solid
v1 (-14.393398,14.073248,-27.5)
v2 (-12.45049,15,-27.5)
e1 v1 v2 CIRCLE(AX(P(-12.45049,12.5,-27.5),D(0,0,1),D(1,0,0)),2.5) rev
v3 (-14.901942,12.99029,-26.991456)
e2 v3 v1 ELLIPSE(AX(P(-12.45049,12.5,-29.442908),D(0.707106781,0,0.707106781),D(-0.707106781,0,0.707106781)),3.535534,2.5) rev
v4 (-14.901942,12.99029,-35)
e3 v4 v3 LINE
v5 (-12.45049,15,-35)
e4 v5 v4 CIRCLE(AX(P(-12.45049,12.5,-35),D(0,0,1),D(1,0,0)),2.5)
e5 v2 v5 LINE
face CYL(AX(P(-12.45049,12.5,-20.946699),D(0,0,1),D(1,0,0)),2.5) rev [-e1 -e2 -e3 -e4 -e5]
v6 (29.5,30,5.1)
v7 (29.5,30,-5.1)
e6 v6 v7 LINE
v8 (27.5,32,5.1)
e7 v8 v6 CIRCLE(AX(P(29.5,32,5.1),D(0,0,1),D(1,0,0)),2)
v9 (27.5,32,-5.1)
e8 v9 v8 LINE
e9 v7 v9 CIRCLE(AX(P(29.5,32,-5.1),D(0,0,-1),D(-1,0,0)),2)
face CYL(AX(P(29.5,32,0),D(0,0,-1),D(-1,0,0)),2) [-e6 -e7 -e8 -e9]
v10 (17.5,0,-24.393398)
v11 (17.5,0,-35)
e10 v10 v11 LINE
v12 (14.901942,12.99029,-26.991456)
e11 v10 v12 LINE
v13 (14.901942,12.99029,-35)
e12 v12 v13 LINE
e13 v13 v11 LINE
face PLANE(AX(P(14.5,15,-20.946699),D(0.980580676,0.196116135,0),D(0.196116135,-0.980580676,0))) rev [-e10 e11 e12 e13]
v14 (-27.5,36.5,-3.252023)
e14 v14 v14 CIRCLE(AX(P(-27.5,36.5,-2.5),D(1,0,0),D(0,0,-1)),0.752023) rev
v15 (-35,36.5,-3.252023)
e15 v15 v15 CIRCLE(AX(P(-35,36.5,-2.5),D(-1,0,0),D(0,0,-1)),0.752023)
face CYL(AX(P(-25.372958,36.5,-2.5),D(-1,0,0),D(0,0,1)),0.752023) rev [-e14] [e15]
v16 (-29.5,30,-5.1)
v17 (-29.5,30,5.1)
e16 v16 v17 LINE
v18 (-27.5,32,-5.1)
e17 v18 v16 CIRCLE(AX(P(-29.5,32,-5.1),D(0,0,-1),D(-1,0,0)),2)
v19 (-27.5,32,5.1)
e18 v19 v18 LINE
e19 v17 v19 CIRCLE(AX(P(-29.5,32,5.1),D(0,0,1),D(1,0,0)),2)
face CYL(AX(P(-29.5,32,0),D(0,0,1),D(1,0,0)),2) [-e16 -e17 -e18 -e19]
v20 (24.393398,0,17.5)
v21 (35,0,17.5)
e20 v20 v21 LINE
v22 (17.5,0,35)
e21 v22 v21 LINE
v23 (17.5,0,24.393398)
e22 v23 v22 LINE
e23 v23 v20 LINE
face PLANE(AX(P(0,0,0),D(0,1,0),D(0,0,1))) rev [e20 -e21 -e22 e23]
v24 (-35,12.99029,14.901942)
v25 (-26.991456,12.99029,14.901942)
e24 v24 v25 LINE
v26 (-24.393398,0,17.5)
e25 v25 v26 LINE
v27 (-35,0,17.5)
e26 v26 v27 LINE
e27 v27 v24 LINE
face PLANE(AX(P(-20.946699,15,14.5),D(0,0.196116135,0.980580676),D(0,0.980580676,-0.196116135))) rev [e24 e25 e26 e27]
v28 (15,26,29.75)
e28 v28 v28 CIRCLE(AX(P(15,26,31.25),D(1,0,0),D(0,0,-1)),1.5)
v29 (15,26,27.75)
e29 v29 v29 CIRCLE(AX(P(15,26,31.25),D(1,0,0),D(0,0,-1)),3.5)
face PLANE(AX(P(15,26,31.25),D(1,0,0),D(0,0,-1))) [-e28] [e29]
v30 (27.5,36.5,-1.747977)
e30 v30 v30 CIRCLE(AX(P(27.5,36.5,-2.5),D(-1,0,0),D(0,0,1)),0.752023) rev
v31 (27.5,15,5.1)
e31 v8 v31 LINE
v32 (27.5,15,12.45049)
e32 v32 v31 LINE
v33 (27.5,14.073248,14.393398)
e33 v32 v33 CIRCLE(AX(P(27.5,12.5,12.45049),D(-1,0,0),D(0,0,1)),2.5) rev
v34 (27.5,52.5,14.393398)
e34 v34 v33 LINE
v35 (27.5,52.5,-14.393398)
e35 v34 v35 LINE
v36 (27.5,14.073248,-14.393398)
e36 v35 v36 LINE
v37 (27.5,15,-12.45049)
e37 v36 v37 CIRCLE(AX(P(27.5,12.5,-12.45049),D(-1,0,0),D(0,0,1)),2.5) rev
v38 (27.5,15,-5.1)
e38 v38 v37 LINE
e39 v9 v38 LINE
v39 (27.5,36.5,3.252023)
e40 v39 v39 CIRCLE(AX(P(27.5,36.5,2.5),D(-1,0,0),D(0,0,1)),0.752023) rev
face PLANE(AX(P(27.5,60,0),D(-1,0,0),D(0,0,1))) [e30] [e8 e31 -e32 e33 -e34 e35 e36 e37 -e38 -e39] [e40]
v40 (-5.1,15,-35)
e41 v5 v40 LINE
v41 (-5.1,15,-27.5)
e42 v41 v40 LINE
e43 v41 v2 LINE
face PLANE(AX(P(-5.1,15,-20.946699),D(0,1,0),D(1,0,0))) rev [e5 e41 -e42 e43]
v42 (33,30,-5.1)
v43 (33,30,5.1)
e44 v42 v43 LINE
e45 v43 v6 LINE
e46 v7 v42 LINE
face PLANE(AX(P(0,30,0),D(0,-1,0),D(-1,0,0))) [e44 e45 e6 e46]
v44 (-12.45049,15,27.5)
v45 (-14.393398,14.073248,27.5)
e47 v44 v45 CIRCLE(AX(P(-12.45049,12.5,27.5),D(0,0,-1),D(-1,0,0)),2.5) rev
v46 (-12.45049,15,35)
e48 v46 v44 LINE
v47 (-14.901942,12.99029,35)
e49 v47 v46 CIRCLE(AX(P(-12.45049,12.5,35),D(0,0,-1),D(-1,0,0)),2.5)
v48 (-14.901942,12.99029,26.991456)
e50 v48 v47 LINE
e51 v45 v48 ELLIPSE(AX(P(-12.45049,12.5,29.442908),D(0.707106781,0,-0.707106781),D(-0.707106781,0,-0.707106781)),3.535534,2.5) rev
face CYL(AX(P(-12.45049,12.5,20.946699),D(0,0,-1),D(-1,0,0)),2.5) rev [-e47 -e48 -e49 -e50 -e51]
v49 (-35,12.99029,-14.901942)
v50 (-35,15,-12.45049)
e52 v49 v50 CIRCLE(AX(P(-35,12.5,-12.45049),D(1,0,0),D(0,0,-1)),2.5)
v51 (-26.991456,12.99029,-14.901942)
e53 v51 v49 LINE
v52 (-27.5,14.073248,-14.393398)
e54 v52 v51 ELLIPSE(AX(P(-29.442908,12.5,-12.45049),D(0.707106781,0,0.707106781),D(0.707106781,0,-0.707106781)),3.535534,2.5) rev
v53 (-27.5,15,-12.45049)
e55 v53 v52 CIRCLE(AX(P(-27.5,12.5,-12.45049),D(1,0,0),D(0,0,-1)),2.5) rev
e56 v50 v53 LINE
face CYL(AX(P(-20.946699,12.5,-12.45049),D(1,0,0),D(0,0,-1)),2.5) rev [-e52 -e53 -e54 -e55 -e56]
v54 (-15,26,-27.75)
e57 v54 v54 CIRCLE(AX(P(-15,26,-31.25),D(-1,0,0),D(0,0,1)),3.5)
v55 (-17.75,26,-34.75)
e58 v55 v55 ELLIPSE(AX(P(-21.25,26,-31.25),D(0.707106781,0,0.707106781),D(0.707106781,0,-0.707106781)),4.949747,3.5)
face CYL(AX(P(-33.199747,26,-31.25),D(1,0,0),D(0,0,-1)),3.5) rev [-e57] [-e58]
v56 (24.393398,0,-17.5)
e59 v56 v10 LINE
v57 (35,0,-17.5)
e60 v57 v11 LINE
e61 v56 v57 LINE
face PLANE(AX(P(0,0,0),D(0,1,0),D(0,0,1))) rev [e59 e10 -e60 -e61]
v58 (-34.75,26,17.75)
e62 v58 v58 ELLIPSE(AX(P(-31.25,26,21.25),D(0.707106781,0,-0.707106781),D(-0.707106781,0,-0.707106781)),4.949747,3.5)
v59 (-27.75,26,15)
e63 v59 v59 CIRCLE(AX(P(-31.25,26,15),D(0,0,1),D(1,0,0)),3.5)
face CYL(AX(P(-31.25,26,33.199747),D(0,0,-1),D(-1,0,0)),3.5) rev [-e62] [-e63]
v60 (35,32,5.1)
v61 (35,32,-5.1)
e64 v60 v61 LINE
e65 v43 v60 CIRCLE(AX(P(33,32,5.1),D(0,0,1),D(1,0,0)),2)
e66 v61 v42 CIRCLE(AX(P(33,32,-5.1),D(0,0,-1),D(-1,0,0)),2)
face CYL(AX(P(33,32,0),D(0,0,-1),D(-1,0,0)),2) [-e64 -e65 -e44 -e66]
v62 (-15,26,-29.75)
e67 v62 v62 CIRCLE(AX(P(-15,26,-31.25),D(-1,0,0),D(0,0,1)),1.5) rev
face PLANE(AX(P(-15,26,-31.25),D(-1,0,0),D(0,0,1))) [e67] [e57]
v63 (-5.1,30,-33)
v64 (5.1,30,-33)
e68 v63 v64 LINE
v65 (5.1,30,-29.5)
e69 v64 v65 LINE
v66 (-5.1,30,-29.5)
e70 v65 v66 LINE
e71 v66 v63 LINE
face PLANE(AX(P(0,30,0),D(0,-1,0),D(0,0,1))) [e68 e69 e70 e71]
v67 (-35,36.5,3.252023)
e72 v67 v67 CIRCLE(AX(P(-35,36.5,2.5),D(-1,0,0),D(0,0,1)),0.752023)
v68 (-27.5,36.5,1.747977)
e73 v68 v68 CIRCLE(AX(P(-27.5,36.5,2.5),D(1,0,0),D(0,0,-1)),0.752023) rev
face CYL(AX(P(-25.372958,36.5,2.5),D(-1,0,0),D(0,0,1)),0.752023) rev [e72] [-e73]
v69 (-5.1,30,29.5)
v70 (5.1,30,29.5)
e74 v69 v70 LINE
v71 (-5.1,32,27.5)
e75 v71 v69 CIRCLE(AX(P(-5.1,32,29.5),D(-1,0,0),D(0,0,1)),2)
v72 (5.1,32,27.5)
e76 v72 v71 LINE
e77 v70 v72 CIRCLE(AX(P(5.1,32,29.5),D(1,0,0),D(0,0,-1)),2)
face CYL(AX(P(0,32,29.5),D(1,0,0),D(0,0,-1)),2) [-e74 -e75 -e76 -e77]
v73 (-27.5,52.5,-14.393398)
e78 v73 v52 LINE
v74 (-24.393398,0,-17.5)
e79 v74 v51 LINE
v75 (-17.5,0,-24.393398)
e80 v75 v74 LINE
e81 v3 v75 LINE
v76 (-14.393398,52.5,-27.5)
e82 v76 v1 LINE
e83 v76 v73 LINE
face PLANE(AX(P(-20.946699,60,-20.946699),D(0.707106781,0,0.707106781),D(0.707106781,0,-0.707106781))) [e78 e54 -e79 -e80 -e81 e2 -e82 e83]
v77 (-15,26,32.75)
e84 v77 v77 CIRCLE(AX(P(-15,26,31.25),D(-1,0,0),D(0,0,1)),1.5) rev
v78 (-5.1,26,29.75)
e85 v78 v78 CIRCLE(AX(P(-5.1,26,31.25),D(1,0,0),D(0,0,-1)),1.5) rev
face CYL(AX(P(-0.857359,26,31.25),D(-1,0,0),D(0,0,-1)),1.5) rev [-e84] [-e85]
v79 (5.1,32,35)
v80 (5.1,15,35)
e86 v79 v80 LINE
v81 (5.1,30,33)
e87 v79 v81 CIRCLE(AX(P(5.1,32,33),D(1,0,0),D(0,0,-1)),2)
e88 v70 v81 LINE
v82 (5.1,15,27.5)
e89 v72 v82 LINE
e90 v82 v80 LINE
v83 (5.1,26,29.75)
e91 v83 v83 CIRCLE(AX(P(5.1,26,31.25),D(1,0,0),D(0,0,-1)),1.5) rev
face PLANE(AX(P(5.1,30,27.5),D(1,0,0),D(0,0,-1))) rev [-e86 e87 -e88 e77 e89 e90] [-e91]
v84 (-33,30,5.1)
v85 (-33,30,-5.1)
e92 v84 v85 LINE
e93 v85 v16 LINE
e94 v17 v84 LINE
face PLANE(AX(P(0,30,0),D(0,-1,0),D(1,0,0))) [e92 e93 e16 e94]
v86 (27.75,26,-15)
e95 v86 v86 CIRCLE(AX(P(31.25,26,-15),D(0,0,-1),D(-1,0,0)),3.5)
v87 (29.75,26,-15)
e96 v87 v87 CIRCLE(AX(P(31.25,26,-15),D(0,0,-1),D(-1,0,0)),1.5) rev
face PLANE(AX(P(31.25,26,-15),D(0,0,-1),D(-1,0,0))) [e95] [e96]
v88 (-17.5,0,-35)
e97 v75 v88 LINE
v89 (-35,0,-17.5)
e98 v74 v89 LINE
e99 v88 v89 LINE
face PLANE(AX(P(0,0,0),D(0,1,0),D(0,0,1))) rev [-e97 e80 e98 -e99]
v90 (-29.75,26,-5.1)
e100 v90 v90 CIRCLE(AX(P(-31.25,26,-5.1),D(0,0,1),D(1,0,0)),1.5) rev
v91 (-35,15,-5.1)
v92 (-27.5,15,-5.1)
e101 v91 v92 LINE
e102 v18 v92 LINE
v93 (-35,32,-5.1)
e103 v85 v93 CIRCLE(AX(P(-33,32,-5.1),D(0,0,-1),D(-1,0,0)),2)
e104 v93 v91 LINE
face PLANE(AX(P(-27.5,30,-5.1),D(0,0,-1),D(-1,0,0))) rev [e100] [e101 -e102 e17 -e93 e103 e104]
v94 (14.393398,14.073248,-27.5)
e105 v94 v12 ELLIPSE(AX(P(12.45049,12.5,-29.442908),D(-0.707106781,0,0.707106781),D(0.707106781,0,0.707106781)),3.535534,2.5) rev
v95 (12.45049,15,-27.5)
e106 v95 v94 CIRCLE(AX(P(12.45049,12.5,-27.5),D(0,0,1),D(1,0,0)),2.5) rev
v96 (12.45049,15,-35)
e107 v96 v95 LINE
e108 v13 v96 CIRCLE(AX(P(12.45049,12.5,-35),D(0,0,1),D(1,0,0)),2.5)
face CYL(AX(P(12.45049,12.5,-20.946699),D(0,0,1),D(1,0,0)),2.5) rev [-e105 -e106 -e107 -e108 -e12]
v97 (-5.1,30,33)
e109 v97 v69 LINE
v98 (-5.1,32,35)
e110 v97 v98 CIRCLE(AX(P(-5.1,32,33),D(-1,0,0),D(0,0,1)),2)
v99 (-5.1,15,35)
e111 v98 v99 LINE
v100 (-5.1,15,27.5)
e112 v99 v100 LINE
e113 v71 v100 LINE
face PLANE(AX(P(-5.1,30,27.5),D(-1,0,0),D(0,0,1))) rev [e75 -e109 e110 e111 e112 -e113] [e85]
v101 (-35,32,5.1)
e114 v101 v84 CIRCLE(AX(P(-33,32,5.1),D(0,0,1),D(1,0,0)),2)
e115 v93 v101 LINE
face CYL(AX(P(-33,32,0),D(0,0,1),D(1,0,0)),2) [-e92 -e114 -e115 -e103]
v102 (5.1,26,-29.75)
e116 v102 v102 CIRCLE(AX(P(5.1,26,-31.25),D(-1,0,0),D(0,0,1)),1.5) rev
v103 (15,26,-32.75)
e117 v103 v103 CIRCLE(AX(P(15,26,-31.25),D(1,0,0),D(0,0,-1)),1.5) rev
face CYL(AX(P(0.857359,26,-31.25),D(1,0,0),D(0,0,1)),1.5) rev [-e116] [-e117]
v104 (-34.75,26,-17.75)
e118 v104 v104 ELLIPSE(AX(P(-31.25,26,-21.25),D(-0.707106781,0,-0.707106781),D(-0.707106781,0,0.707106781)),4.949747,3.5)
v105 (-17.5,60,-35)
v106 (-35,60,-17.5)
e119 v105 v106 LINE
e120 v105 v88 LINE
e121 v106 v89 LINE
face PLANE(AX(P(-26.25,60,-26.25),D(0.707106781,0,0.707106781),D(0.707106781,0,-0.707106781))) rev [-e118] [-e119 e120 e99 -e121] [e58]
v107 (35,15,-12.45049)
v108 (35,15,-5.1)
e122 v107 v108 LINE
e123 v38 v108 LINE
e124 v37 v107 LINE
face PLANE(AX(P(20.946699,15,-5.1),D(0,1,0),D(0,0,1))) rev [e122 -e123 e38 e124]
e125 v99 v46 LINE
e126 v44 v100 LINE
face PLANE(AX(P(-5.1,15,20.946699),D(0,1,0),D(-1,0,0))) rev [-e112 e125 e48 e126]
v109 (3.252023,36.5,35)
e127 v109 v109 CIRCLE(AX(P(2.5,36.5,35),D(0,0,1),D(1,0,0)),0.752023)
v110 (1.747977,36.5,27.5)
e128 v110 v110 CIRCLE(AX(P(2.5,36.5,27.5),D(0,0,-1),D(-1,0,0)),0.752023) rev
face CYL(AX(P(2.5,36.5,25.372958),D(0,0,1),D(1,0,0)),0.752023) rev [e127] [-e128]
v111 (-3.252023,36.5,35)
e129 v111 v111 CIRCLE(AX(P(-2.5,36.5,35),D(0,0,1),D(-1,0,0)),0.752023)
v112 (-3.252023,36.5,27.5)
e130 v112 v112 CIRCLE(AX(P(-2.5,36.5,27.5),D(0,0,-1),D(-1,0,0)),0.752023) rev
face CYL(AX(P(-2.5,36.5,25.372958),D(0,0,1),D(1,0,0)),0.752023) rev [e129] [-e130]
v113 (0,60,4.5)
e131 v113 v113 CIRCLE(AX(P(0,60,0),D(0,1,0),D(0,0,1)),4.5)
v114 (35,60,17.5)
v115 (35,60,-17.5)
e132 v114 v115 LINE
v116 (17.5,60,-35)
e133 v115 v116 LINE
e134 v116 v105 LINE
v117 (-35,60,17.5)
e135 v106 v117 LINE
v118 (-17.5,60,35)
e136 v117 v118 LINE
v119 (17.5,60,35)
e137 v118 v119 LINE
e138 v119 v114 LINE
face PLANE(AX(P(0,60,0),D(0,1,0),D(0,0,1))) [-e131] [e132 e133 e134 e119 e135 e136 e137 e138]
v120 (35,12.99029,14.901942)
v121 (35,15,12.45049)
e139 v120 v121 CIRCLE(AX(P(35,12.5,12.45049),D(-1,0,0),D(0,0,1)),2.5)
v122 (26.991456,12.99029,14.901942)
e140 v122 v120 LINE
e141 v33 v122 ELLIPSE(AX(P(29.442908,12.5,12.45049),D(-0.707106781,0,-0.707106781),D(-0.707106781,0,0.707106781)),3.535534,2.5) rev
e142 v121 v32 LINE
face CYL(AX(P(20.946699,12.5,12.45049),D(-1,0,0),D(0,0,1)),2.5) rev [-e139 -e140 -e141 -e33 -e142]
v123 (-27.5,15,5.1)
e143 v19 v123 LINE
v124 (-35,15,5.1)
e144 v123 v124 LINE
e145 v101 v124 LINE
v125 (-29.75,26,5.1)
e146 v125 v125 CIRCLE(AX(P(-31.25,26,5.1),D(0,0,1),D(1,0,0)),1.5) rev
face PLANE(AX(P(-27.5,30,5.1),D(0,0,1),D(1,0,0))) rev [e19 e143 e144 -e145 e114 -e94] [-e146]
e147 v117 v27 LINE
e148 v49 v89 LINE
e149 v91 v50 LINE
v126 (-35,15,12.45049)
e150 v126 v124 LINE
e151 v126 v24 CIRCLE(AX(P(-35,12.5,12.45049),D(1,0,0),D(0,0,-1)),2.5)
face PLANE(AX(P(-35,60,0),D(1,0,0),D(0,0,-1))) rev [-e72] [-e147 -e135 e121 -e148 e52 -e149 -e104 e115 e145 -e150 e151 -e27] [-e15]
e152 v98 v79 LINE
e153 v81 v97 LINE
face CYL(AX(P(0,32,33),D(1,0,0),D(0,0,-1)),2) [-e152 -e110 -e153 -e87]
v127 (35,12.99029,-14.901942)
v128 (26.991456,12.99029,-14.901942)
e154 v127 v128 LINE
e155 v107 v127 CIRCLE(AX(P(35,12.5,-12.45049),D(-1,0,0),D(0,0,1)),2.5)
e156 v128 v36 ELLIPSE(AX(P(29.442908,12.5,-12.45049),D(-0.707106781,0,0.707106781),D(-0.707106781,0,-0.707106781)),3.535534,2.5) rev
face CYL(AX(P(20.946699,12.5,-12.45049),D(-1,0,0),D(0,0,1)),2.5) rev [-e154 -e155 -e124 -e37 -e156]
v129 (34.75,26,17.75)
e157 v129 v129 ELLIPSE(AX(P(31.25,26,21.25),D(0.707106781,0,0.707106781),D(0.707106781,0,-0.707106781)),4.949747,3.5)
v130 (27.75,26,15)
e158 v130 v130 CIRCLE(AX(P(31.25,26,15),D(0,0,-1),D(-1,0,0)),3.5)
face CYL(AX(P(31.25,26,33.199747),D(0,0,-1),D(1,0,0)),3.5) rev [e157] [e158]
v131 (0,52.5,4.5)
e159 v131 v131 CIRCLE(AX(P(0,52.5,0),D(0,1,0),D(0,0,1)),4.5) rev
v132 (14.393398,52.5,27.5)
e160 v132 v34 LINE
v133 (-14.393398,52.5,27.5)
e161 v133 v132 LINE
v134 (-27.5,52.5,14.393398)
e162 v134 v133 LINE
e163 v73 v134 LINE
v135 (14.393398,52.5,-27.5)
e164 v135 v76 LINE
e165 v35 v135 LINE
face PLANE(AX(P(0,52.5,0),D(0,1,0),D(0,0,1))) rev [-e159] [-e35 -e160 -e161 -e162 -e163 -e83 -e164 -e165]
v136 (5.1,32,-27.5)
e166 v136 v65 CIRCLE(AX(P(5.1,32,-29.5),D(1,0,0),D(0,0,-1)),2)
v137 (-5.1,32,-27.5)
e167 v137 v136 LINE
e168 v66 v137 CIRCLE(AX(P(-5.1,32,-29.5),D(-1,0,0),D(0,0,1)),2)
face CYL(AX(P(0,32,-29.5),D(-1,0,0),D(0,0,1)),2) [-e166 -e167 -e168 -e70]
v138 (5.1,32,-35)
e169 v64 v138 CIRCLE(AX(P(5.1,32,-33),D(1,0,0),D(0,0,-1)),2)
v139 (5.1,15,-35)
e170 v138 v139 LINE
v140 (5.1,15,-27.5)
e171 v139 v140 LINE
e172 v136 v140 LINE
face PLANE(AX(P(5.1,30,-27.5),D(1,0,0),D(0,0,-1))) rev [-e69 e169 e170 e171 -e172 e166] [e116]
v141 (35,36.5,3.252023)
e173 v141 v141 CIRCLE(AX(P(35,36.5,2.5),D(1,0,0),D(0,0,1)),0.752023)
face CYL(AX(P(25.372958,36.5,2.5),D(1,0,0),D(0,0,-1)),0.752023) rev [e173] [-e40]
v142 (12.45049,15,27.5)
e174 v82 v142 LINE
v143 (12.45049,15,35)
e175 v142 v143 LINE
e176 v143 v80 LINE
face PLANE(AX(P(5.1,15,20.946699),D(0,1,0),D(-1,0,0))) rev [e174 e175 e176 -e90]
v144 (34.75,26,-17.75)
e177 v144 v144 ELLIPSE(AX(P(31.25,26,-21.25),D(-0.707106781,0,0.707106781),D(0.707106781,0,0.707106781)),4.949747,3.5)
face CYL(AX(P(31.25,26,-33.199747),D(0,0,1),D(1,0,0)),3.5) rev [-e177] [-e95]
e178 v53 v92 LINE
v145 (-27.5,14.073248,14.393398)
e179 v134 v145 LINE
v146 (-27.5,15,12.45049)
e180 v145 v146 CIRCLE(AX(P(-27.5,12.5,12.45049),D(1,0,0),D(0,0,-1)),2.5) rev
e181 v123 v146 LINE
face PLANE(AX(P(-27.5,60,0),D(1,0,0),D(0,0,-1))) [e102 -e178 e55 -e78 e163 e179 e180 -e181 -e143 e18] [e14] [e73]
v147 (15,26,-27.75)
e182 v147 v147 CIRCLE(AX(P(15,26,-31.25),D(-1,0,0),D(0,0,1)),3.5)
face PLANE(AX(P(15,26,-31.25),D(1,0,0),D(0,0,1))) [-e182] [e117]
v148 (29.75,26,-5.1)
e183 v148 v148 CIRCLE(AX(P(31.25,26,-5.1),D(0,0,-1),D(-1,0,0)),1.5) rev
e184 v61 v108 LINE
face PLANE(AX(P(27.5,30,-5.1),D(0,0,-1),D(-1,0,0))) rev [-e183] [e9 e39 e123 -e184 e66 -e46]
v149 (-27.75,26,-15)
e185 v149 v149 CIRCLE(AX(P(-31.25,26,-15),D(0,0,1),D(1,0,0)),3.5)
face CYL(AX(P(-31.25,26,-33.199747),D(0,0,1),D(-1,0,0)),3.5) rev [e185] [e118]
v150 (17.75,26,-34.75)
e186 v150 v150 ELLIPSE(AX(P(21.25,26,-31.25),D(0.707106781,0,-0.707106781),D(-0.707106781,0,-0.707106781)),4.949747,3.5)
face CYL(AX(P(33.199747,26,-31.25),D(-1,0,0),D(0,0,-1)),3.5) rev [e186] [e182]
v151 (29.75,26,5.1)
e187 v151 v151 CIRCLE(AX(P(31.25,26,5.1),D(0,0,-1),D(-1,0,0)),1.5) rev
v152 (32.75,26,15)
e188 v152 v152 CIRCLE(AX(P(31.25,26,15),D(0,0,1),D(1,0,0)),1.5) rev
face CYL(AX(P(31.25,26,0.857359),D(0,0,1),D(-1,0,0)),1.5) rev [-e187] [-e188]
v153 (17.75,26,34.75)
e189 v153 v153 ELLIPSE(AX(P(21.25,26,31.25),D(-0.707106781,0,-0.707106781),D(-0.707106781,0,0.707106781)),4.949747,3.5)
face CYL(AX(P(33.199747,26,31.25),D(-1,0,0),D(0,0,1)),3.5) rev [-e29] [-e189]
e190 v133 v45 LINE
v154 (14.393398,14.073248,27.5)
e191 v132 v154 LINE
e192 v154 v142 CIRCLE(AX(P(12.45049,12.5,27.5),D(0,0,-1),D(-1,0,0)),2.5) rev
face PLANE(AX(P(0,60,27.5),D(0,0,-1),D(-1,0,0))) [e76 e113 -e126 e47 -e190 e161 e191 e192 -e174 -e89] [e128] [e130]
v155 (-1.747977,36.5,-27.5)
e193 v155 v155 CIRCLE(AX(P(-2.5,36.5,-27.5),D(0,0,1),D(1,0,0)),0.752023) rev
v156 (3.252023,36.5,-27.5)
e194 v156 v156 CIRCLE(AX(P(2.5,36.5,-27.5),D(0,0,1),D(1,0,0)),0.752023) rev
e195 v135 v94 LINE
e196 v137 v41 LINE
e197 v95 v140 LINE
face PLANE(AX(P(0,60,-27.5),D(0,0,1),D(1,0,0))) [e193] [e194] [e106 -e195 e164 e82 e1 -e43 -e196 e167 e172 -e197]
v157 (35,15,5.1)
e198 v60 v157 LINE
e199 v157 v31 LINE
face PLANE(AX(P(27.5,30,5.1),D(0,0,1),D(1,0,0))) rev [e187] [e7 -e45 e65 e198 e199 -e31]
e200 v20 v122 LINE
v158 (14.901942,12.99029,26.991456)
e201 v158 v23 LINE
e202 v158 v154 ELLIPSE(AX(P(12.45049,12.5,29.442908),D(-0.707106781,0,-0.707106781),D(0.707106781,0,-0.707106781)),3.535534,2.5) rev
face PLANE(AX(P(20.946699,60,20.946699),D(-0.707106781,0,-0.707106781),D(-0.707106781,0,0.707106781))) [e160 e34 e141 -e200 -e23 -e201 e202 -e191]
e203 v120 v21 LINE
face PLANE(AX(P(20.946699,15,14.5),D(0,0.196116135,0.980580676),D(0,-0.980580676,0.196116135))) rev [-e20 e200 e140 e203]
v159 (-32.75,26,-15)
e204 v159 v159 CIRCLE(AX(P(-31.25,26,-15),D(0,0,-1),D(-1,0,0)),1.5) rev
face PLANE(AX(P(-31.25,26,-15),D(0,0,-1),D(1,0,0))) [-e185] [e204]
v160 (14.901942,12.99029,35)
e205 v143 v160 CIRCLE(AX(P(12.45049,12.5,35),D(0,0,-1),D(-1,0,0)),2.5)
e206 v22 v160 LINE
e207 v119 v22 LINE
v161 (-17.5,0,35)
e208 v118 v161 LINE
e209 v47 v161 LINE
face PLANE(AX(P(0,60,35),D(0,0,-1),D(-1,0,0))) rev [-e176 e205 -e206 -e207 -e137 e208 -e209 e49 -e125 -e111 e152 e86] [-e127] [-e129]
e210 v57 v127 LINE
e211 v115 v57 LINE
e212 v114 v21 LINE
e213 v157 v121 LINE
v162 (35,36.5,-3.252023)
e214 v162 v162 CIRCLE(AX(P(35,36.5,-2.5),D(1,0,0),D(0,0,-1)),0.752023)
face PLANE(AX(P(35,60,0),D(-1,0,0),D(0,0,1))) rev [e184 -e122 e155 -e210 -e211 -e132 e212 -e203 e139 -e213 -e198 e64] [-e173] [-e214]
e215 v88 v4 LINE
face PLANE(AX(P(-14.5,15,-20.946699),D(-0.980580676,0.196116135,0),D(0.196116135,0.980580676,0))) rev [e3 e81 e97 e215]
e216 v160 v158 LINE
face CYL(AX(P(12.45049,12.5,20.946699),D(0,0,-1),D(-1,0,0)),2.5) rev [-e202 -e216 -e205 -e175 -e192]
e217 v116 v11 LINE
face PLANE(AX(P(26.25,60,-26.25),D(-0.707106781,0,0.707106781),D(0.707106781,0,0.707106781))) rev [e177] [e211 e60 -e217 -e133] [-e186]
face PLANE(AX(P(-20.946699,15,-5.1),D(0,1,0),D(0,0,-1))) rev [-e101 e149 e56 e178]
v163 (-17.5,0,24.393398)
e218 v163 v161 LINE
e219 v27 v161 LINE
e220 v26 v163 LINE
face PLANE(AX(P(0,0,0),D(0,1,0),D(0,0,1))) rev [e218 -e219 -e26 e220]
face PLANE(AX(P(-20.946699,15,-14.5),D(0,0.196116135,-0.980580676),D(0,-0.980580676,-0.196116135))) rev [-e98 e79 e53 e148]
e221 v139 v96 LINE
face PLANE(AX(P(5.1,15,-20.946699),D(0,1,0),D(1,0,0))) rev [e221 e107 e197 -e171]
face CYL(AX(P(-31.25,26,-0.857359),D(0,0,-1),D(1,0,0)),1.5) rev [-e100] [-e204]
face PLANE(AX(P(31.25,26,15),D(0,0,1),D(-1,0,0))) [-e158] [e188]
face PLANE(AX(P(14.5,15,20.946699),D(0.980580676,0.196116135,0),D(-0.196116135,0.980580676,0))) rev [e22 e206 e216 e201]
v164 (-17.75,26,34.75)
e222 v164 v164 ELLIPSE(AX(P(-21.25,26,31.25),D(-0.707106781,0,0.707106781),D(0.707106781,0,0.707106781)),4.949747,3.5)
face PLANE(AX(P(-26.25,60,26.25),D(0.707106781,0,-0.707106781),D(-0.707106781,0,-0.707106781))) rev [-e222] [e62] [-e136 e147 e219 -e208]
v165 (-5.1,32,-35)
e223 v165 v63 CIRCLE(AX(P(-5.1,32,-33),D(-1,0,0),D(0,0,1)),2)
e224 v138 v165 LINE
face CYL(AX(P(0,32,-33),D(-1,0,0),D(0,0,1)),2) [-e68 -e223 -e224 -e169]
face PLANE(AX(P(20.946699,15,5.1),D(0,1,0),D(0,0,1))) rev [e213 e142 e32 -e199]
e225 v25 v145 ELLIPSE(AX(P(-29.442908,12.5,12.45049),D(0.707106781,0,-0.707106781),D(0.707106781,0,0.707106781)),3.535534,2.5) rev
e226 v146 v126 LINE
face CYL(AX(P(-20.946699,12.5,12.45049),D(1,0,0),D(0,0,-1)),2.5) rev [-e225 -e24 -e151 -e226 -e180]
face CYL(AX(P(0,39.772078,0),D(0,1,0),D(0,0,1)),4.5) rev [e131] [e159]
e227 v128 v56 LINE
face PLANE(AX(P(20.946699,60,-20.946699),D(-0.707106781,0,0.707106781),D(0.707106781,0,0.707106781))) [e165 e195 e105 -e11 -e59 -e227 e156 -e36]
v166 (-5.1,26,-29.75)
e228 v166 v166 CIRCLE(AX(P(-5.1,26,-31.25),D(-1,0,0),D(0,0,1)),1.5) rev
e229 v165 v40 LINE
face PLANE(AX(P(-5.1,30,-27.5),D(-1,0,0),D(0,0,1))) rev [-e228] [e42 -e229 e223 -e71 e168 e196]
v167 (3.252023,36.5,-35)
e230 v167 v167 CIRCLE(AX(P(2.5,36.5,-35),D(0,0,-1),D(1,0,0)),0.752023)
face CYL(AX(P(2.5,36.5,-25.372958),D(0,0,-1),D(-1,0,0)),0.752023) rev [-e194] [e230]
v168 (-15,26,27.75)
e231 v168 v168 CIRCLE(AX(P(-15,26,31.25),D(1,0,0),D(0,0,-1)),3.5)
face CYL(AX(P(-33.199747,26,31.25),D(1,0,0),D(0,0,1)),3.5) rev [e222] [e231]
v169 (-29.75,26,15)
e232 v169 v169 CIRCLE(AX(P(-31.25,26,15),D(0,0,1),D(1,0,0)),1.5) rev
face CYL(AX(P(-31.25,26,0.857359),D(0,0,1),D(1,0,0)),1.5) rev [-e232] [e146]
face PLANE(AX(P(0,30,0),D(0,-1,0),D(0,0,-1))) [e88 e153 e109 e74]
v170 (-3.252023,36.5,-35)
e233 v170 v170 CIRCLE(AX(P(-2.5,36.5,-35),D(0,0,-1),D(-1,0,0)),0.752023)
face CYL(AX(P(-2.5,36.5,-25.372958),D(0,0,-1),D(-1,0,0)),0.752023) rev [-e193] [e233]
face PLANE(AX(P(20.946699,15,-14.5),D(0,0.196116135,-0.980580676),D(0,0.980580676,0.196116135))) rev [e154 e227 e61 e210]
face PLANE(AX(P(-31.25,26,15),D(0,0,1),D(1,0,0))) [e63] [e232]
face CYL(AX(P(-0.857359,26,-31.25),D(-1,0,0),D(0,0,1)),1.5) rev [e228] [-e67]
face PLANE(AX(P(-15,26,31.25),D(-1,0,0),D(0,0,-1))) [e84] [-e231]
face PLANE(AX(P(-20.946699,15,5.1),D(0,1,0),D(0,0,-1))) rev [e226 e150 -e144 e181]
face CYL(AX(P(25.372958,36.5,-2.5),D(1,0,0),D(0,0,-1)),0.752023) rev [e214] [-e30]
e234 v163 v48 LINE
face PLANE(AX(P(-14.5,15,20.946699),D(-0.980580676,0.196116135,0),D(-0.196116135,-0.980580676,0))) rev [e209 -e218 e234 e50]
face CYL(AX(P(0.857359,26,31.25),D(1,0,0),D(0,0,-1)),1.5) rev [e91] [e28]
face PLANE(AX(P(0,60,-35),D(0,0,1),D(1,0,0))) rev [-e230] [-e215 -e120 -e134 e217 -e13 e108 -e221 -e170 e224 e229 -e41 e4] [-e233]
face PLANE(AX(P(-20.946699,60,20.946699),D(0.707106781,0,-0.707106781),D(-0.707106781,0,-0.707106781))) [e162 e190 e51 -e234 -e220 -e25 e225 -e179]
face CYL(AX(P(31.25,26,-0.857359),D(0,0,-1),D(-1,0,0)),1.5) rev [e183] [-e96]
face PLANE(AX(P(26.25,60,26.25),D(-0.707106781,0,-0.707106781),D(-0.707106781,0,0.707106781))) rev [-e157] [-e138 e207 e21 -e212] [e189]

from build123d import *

# Parameters (mm, degrees)
BOSS_EXTRUDE2_DEPTH      = 60
SHELL2_T                 = -7.5
SKETCH14_R               = 4.5
CUT_EXTRUDE3_DEPTH       = 7.5
SKETCH24_W               = 10.2
SKETCH24_H               = 7.5
CUT_EXTRUDE14_DEPTH      = 30
SKETCH20_R               = 1.5
CUT_EXTRUDE15_DEPTH      = 9.9
CUT_EXTRUDE16_REACH      = 87.586
SKETCH20_5_R             = 3.5
CIRPATTERN20_COUNT       = 4
CIRPATTERN21_START       = -24.7500001
CIRPATTERN21_OUTLINE_R   = 3.5
CIRPATTERN21_DEPTH       = 9.7500001
CIRPATTERN21_START_2     = 15
CIRPATTERN21_2_OUTLINE_R = 3.5
CIRPATTERN21_2_DEPTH     = 9.7500001
CIRPATTERN21_START_3     = -15
CIRPATTERN21_3_OUTLINE_R = 1.5
CIRPATTERN21_3_DEPTH     = 30
CIRPATTERN21_4_OUTLINE_R = 3.5
CIRPATTERN21_4_DEPTH     = 9.7500001
CIRPATTERN21_5_OUTLINE_R = 3.5
CIRPATTERN21_5_DEPTH     = 9.7500001
CIRPATTERN21_6_OUTLINE_R = 1.5
CIRPATTERN21_6_DEPTH     = 30
FILLET1_R                = 2
CUT_EXTRUDE17_REACH      = 100.615
SKETCH30_R               = 0.752022917
CUT_EXTRUDE19_START      = -10.606601718
CUT_EXTRUDE19_DEPTH      = 10.606601718
CIRPATTERN30_COUNT       = 4
FILLET4_R                = 2.5


# Read off the part's stored shape, not the designer's step: CirPattern21, Cut-Extrude19
with BuildPart() as part:
    # Sketch11 → Boss-Extrude2 (new body)
    with BuildSketch(Plane(origin=(0, 0, 0), x_dir=(1, 0, 0), z_dir=(0, 1, 0))):
        Polygon((17.5, 35), (0, 35), (-17.5, 35), (-35, 17.5), (-35, 0), (-35, -17.5), (-17.5, -35), (0, -35), (17.5, -35), (35, -17.5), (35, 0), (35, 17.5), align=None)
    extrude(amount=BOSS_EXTRUDE2_DEPTH)

    # Shell2
    shell2_openings = [part.faces().sort_by_distance(p)[0] for p in [
        (0, 0, 0),
    ]]
    offset(amount=SHELL2_T, openings=shell2_openings, kind=Kind.INTERSECTION)

    # Sketch14 → Cut-Extrude3 (cut)
    with BuildSketch(Plane(origin=(0, 60, 0), x_dir=(1, 0, 0), z_dir=(0, 1, 0))):
        with Locations(Location((0, 0, 0), (0, 0, 270))):
            Circle(SKETCH14_R)
    extrude(amount=-CUT_EXTRUDE3_DEPTH, mode=Mode.SUBTRACT)

    # Sketch24 → Cut-Extrude14 (cut)
    with BuildSketch(Plane.XZ):
        with Locations((0, 31.25)):
            Rectangle(SKETCH24_W, SKETCH24_H)
    cut_extrude14 = extrude(amount=-CUT_EXTRUDE14_DEPTH, mode=Mode.SUBTRACT)

    # Sketch20 → Cut-Extrude15 (cut)
    with BuildSketch(Plane(origin=(15, 0, 0), x_dir=(0, 0, -1), z_dir=(1, 0, 0))):
        with Locations((-31.25, 26)):
            Circle(SKETCH20_R)
    cut_extrude15 = extrude(amount=-CUT_EXTRUDE15_DEPTH, mode=Mode.SUBTRACT)

    # Cut-Extrude16: up to this plane
    cut_extrude16_end = Plane(origin=(26.25, 60, 26.25), z_dir=(-0.7071067811864445, 0, -0.7071067811866506))
    # Sketch20<5> → Cut-Extrude16 (cut, up to the surface)
    with BuildSketch(Plane(origin=(15, 0, 0), x_dir=(0, 0, -1), z_dir=(1, 0, 0)), mode=Mode.PRIVATE) as cut_extrude16_sk1:
        with Locations(Location((-31.25, 26, 0), (0, 0, 180))):
            Circle(SKETCH20_5_R)
    cut_extrude16_tool1 = split(extrude(cut_extrude16_sk1.sketch, amount=CUT_EXTRUDE16_REACH, mode=Mode.PRIVATE), bisect_by=cut_extrude16_end, keep=Keep.BOTH, mode=Mode.PRIVATE)
    cut_extrude16 = cut_extrude16_tool1.solids().sort_by_distance((15, 26, 31.25))[0]
    add(cut_extrude16, mode=Mode.SUBTRACT)

    # Mirror2: Cut-Extrude15, Cut-Extrude16 across plane
    add(cut_extrude15.mirror(Plane(origin=(0, 0, 0), x_dir=(0, 0, 1), z_dir=(1, 0, 0))), mode=Mode.SUBTRACT)
    add(cut_extrude16.mirror(Plane(origin=(0, 0, 0), x_dir=(0, 0, 1), z_dir=(1, 0, 0))), mode=Mode.SUBTRACT)

    # CirPattern20: Cut-Extrude14 ×4 about axis
    cirpattern20_axis = Axis((0, 0, 0), (0, 1, 0))
    for i in range(1, CIRPATTERN20_COUNT):
        add(cut_extrude14.rotate(cirpattern20_axis, i * 360 / CIRPATTERN20_COUNT), mode=Mode.SUBTRACT)

    # CirPattern21 outline → CirPattern21 (cut)
    with BuildSketch(Plane.YZ.offset(CIRPATTERN21_START)):
        with Locations((26, -31.25)):
            Circle(CIRPATTERN21_OUTLINE_R)
    extrude(amount=CIRPATTERN21_DEPTH, mode=Mode.SUBTRACT)

    # CirPattern21 2 outline → CirPattern21 2 (cut)
    with BuildSketch(Plane.YZ.offset(CIRPATTERN21_START_2)):
        with Locations((26, -31.25)):
            Circle(CIRPATTERN21_2_OUTLINE_R)
    extrude(amount=CIRPATTERN21_2_DEPTH, mode=Mode.SUBTRACT)

    # CirPattern21 3 outline → CirPattern21 3 (cut)
    with BuildSketch(Plane.YZ.offset(CIRPATTERN21_START_3)):
        with Locations((26, -31.25)):
            Circle(CIRPATTERN21_3_OUTLINE_R)
    extrude(amount=CIRPATTERN21_3_DEPTH, mode=Mode.SUBTRACT)

    # CirPattern21 4 outline → CirPattern21 4 (cut)
    with BuildSketch(Plane.XY.offset(CIRPATTERN21_START)):
        with Locations((-31.25, 26)):
            Circle(CIRPATTERN21_4_OUTLINE_R)
        with Locations((31.25, 26)):
            Circle(CIRPATTERN21_4_OUTLINE_R)
    extrude(amount=CIRPATTERN21_4_DEPTH, mode=Mode.SUBTRACT)

    # CirPattern21 5 outline → CirPattern21 5 (cut)
    with BuildSketch(Plane.XY.offset(CIRPATTERN21_START_2)):
        with Locations((-31.25, 26)):
            Circle(CIRPATTERN21_5_OUTLINE_R)
        with Locations((31.25, 26)):
            Circle(CIRPATTERN21_5_OUTLINE_R)
    extrude(amount=CIRPATTERN21_5_DEPTH, mode=Mode.SUBTRACT)

    # CirPattern21 6 outline → CirPattern21 6 (cut)
    with BuildSketch(Plane.XY.offset(CIRPATTERN21_START_3)):
        with Locations((-31.25, 26)):
            Circle(CIRPATTERN21_6_OUTLINE_R)
        with Locations((31.25, 26)):
            Circle(CIRPATTERN21_6_OUTLINE_R)
    extrude(amount=CIRPATTERN21_6_DEPTH, mode=Mode.SUBTRACT)

    # Fillet1
    fillet1_edges = [part.edges().sort_by_distance(p)[0] for p in [
        (-27.5, 30, 0),
        (-35, 30, 0),
        (0, 30, -27.5),
        (0, 30, -35),
        (27.5, 30, 0),
        (35, 30, 0),
        (0, 30, 27.5),
        (0, 30, 35),
    ]]
    fillet(fillet1_edges, radius=FILLET1_R)

    # Sketch30 → Cut-Extrude17 (cut, up to next)
    with BuildSketch(Plane.XY.offset(35), mode=Mode.PRIVATE) as cut_extrude17_sk1:
        with Locations((2.5, 36.5)):
            Circle(SKETCH30_R)
    cut_extrude17_tool1 = extrude(cut_extrude17_sk1.sketch, amount=-CUT_EXTRUDE17_REACH, mode=Mode.PRIVATE) & part.part
    # Sketch30 → Cut-Extrude17 (cut, up to next)
    with BuildSketch(Plane.XY.offset(35), mode=Mode.PRIVATE) as cut_extrude17_sk2:
        with Locations(Location((-2.5, 36.5, 0), (0, 0, 180))):
            Circle(SKETCH30_R)
    cut_extrude17_tool2 = extrude(cut_extrude17_sk2.sketch, amount=-CUT_EXTRUDE17_REACH, mode=Mode.PRIVATE) & part.part
    cut_extrude17_1 = cut_extrude17_tool1.solids().sort_by_distance((2.5, 36.5, 35))[0]
    add(cut_extrude17_1, mode=Mode.SUBTRACT)
    cut_extrude17_2 = cut_extrude17_tool2.solids().sort_by_distance((-2.5, 36.5, 35))[0]
    add(cut_extrude17_2, mode=Mode.SUBTRACT)
    cut_extrude17 = cut_extrude17_1 + cut_extrude17_2  # Cut-Extrude17 as one shape, for the pattern or mirror that repeats it

    # Cut-Extrude19 outline → Cut-Extrude19 (cut)
    with BuildSketch(Plane(origin=(35, 0, 0), x_dir=(0, 0, -1), z_dir=(1, 0, 0)).offset(CUT_EXTRUDE19_START)):
        Polygon((17.5, 0), (14.5, 15), (5.1, 15), (5.1, 0), align=None)
        Polygon((-5.1, 0), (-5.1, 15), (-14.5, 15), (-17.5, 0), align=None)
    cut_extrude19 = extrude(amount=CUT_EXTRUDE19_DEPTH, mode=Mode.SUBTRACT)

    # CirPattern30: Cut-Extrude17, Cut-Extrude19 ×4 about axis
    cirpattern30_axis = Axis((0, 0, 0), (0, 1, 0))
    add([cut_extrude17.rotate(cirpattern30_axis, i * 360 / CIRPATTERN30_COUNT) for i in range(1, CIRPATTERN30_COUNT)], mode=Mode.SUBTRACT)
    add([cut_extrude19.rotate(cirpattern30_axis, i * 360 / CIRPATTERN30_COUNT) for i in range(1, CIRPATTERN30_COUNT)], mode=Mode.SUBTRACT)

    # Fillet4
    fillet4_edges = [part.edges().sort_by_distance(p)[0] for p in [
        (31.196699141, 15, -14.5),
        (31.196699141, 15, 14.5),
        (14.5, 15, -31.196699141),
        (-14.5, 15, -31.196699141),
        (-31.196699141, 15, -14.5),
        (-31.196699141, 15, 14.5),
        (-14.5, 15, 31.196699141),
        (14.5, 15, 31.196699141),
    ]]
    fillet(fillet4_edges, radius=FILLET4_R)


solid = part.part
